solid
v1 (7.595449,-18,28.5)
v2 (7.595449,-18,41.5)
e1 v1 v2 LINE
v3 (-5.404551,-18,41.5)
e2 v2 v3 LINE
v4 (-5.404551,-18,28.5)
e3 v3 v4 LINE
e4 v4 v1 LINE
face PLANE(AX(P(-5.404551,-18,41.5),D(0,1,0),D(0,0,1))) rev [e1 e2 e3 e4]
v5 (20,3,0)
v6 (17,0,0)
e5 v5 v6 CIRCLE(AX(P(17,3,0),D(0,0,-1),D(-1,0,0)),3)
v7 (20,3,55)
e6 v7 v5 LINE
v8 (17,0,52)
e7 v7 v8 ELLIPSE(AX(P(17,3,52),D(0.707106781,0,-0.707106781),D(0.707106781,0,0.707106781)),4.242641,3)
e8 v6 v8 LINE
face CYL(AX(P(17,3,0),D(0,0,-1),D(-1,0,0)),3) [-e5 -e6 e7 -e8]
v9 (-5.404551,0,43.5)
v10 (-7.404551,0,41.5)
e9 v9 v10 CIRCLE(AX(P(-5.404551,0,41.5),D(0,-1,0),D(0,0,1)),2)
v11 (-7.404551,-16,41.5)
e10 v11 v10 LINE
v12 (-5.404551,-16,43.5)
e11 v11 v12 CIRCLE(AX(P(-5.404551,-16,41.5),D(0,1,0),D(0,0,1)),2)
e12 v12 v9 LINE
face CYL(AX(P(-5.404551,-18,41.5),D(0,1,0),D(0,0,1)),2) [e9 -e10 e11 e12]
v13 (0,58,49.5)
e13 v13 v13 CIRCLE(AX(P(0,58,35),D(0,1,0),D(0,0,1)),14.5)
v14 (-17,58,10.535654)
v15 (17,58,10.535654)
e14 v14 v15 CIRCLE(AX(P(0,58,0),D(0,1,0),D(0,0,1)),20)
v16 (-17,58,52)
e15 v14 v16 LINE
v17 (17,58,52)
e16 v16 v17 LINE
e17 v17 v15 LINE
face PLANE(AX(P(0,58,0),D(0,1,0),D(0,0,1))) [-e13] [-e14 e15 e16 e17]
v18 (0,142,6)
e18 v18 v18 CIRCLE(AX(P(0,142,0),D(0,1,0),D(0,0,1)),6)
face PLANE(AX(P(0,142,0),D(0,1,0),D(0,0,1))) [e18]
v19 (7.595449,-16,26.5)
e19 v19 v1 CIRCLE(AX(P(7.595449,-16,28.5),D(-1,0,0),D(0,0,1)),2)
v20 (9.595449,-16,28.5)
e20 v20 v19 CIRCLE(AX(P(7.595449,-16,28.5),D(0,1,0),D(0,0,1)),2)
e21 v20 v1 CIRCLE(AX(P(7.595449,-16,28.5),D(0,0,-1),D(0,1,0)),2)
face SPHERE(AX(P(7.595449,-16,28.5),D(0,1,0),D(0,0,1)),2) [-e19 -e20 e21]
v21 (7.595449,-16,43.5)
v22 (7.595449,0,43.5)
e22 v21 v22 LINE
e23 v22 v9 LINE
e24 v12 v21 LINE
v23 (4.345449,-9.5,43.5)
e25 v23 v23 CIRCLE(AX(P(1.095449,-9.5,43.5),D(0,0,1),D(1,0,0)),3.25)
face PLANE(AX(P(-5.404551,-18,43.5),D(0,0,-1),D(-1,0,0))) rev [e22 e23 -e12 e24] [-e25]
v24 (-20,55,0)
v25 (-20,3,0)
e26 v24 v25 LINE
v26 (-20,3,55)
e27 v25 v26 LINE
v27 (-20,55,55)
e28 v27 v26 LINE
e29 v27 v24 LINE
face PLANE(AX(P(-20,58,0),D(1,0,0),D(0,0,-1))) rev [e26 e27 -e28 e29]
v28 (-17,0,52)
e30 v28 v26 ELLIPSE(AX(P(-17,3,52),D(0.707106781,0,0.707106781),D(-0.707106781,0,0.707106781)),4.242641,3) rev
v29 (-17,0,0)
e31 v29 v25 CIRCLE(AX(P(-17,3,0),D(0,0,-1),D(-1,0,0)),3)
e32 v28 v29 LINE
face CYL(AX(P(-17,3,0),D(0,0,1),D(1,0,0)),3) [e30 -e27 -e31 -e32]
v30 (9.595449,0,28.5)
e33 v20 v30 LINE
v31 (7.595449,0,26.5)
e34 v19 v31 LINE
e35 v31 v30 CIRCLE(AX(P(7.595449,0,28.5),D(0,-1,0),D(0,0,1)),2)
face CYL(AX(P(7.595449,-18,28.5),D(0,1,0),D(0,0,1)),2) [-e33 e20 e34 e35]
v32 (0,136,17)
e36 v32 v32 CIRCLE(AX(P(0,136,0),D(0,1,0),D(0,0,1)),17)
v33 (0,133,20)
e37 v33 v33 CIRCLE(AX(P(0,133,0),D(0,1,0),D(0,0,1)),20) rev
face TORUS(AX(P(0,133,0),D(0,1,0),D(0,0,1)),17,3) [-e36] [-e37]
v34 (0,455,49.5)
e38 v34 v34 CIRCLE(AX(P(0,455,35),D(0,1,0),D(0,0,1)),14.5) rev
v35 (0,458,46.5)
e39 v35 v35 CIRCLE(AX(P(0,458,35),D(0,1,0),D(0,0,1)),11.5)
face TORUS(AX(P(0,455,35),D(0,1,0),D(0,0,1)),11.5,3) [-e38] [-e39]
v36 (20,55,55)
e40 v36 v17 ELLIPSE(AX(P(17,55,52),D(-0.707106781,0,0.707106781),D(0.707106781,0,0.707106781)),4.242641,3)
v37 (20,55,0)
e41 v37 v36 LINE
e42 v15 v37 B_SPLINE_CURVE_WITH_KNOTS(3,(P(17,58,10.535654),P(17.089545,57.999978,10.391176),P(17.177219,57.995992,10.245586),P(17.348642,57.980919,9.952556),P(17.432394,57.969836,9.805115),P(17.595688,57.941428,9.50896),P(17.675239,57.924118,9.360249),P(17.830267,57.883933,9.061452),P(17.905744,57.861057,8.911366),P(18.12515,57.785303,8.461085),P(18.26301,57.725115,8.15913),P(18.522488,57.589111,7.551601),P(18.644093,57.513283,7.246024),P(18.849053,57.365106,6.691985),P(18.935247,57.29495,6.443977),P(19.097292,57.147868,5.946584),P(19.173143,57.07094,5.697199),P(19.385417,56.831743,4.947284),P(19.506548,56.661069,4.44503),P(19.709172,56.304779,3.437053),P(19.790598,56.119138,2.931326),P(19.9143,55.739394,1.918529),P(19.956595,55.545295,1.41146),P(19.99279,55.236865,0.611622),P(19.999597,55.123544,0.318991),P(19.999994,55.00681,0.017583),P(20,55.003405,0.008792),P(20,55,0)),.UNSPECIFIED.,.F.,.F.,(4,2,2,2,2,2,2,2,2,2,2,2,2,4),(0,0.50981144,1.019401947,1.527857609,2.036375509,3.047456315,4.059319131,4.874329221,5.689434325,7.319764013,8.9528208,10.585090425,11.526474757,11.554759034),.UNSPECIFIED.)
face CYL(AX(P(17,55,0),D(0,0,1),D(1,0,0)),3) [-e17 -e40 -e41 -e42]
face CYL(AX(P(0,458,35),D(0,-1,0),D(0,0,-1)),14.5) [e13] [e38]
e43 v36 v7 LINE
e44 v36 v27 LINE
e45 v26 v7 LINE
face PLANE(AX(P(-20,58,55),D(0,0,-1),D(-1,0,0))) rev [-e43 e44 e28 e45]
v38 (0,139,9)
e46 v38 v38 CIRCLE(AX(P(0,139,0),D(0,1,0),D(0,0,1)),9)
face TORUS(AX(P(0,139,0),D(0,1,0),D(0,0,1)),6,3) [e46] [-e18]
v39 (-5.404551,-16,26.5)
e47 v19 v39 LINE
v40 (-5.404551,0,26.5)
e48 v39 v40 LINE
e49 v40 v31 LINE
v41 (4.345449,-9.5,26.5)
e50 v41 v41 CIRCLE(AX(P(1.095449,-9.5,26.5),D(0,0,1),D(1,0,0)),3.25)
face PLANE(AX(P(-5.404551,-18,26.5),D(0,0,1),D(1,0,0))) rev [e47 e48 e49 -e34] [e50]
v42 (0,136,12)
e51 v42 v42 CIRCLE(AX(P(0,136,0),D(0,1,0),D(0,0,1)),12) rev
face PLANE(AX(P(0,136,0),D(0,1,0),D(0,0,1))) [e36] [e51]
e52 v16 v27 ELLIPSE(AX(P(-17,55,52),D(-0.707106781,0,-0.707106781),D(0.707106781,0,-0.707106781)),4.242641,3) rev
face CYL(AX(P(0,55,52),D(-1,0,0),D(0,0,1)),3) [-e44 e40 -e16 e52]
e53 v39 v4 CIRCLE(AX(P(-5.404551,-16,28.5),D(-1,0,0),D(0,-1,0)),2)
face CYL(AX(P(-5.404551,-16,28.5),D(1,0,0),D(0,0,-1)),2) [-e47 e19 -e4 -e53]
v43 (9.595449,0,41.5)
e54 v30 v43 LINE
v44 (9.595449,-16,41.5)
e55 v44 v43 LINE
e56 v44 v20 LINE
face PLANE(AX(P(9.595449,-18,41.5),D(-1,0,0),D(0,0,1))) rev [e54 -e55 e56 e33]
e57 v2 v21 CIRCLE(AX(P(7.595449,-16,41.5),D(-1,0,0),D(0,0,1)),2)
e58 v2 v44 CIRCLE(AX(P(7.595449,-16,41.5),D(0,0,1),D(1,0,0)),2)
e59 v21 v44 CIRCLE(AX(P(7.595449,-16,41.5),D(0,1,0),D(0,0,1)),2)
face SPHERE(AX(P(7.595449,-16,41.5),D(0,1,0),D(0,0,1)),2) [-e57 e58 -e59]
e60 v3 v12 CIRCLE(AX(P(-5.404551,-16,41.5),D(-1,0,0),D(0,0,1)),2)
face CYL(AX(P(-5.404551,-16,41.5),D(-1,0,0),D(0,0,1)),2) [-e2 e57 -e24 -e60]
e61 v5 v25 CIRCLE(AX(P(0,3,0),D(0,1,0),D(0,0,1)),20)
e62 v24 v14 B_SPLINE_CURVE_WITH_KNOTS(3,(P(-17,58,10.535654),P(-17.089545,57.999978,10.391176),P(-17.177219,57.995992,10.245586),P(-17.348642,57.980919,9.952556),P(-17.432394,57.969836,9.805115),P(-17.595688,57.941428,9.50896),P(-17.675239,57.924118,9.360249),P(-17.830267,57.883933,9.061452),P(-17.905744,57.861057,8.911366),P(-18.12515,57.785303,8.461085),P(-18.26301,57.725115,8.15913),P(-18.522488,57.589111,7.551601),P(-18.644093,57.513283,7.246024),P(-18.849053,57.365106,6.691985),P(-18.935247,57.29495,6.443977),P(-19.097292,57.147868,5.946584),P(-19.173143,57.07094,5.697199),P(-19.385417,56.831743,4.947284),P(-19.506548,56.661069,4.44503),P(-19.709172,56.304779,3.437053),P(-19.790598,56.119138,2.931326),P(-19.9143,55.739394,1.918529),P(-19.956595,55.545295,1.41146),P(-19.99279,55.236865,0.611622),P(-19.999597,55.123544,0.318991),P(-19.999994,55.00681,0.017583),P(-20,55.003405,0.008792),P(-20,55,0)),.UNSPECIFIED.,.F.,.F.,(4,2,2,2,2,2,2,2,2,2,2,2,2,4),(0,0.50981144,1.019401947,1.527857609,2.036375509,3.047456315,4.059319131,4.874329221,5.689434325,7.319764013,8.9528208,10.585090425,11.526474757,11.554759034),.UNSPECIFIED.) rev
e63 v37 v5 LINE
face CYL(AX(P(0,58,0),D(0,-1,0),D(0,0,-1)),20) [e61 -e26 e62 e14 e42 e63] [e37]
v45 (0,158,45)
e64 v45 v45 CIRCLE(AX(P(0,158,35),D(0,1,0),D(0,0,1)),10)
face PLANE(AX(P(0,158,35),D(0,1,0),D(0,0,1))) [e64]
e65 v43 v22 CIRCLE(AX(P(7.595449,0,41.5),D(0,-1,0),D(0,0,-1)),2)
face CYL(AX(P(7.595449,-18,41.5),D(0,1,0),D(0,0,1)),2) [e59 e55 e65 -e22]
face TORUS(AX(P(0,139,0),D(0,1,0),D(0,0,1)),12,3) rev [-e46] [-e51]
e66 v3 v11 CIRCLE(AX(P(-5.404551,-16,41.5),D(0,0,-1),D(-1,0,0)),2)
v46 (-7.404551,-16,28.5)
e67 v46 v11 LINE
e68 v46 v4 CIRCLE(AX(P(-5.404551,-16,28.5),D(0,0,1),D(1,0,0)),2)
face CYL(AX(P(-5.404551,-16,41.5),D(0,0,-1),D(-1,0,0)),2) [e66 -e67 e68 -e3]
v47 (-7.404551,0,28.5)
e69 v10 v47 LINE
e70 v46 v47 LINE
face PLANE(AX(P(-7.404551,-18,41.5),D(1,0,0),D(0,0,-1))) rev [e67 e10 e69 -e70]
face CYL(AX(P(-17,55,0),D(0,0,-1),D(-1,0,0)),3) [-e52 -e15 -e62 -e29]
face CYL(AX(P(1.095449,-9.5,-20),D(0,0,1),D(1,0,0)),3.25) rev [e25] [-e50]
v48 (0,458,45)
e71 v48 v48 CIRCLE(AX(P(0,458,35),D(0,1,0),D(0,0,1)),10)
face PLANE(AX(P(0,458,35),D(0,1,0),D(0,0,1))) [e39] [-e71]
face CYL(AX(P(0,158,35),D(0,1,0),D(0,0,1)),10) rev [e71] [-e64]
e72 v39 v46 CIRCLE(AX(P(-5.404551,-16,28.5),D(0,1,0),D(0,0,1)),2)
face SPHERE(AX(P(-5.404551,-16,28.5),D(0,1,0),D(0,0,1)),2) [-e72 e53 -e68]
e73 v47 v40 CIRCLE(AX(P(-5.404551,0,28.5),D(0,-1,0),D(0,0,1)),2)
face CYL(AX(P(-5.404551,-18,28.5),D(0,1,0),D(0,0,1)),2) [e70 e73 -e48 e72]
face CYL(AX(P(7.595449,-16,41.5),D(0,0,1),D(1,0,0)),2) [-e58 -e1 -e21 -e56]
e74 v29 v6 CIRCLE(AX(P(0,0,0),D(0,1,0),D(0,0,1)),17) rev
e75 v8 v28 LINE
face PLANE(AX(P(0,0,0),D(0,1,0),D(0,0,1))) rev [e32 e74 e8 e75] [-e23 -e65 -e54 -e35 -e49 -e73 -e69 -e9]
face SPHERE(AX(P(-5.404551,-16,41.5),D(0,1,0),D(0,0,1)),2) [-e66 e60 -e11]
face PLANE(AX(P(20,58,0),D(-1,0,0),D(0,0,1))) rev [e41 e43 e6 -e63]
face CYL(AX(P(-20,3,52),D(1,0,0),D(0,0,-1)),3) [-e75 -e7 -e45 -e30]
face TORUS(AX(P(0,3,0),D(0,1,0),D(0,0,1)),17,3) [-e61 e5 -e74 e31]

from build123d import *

# Parameters (mm, degrees)
EXTRUDE_1_DEPTH     = 58
SKETCH_2_R          = 20
EXTRUDE_7_DEPTH     = 78
SKETCH_3_R          = 14.5
EXTRUDE_8_DEPTH     = 400
SKETCH_4_R          = 10
CUT_EXTRUDE_1_DEPTH = 300
FILLET_2_R          = 3
FILLET_START        = -21
FILLET_3_DEPTH      = 77
FILLET_3_2_DEPTH    = 41
FILLET_3_3_ANGLE    = 180
FILLET_4_R          = 3
SKETCH_6_R          = 9
EXTRUDE_10_DEPTH    = 6
FILLET_5_R          = 3
FILLET_6_R          = 3
EXTRUDE_11_DEPTH    = 18
FILLET_7_R          = 2
SKETCH_9_R          = 3.25
CUT_EXTRUDE_2_DEPTH = 463.813407343


with BuildPart() as part:
    # 草图1 → 凸台-拉伸1 (new body)
    with BuildSketch(Plane(origin=(0, 0, 0), x_dir=(1, 0, 0), z_dir=(0, 1, 0))):
        with BuildLine():
            Line((20, 0), (20, -55))
            Line((20, -55), (-20, -55))
            Line((-20, -55), (-20, 0))
            ThreePointArc((-20, 0), (0, 20), (20, 0))
        make_face()
    extrude(amount=EXTRUDE_1_DEPTH)

    # 草图2 → 凸台-拉伸7 (add)
    with BuildSketch(Plane(origin=(0, 58, 0), x_dir=(1, 0, 0), z_dir=(0, 1, 0))):
        with Locations(Location((0, 0, 0), (0, 0, 180))):
            Circle(SKETCH_2_R)
    extrude(amount=EXTRUDE_7_DEPTH)

    # 草图3 → 凸台-拉伸8 (add)
    with BuildSketch(Plane(origin=(0, 58, 0), x_dir=(1, 0, 0), z_dir=(0, 1, 0))):
        with Locations(Location((0, -35, 0), (0, 0, 270))):
            Circle(SKETCH_3_R)
    extrude(amount=EXTRUDE_8_DEPTH)

    # 草图4 → 切除-拉伸1 (cut)
    with BuildSketch(Plane(origin=(0, 458, 0), x_dir=(1, 0, 0), z_dir=(0, 1, 0))):
        with Locations(Location((0, -35, 0), (0, 0, 270))):
            Circle(SKETCH_4_R)
    extrude(amount=-CUT_EXTRUDE_1_DEPTH, mode=Mode.SUBTRACT)

    # 圆角2
    # the kernel refuses this fillet: 3 mm, written as the material it takes off along each edge
    with BuildSketch(Plane(origin=(27.5, 58, 55), x_dir=(0, -1, 0), z_dir=(-1, 0, 0))) as fillet_2_piece_1:
        with BuildLine():
            CenterArc((FILLET_2_R, -FILLET_2_R), FILLET_2_R, 90, 90)
            Line((0, -FILLET_2_R), (0, 0))
            Line((0, 0), (FILLET_2_R, 0))
        make_face()
    extrude(amount=55, mode=Mode.SUBTRACT)
    with BuildSketch(Plane(origin=(20, 58, -12.75), x_dir=(0, -1, 0), z_dir=(0, 0, 1))) as fillet_2_piece_2_section:
        with BuildLine():
            CenterArc((FILLET_2_R, -FILLET_2_R), FILLET_2_R, 90, 90)
            Line((0, -FILLET_2_R), (0, 0))
            Line((0, 0), (FILLET_2_R, 0))
        make_face()
    fillet_2_piece_2 = extrude(amount=75.25, mode=Mode.PRIVATE)
    fillet_2_piece_2 = fillet_2_piece_2 - Plane(origin=(0, 58, 0), x_dir=(-1, 0, 0), z_dir=(0, -1, 0)) * Cylinder(20, 163, mode=Mode.PRIVATE)
    add(fillet_2_piece_2, mode=Mode.SUBTRACT)
    with BuildSketch(Plane(origin=(-20, 58, 62.5), x_dir=(1, 0, 0), z_dir=(0, 0, -1))) as fillet_2_piece_3_section:
        with BuildLine():
            CenterArc((FILLET_2_R, FILLET_2_R), FILLET_2_R, 180, 90)
            Line((0, FILLET_2_R), (0, 0))
            Line((0, 0), (FILLET_2_R, 0))
        make_face()
    fillet_2_piece_3 = extrude(amount=75.25, mode=Mode.PRIVATE)
    fillet_2_piece_3 = fillet_2_piece_3 - Plane(origin=(0, 58, 0), x_dir=(-1, 0, 0), z_dir=(0, -1, 0)) * Cylinder(20, 163, mode=Mode.PRIVATE)
    add(fillet_2_piece_3, mode=Mode.SUBTRACT)

    # 圆角3: read off the stored shape, not the designer's step
    # 圆角3 outline → 圆角3 (cut)
    with BuildSketch(Plane.XY.offset(FILLET_START)):
        with BuildLine():
            Line((20, 0), (20, 3))
            ThreePointArc((20, 3), (19.121320344, 0.878679656), (17, 0))
            Line((17, 0), (20, 0))
        make_face()
        with BuildLine():
            Line((-20, 0), (-17, 0))
            ThreePointArc((-17, 0), (-19.121320344, 0.878679656), (-20, 3))
            Line((-20, 3), (-20, 0))
        make_face()
    extrude(amount=FILLET_3_DEPTH, mode=Mode.SUBTRACT)

    # Fillet 3 2 outline → Fillet 3 2 (cut)
    with BuildSketch(Plane.YZ.offset(FILLET_START)):
        with BuildLine():
            ThreePointArc((0, 52), (0.878679656, 54.121320344), (3, 55))
            Line((3, 55), (0, 55))
            Line((0, 55), (0, 52))
        make_face()
    extrude(amount=FILLET_3_2_DEPTH, mode=Mode.SUBTRACT)

    # Fillet 3 3 outline → Fillet 3 3 (revolve, cut)
    with BuildSketch(Plane.XY):
        with BuildLine():
            ThreePointArc((20, 3), (19.121320344, 0.878679656), (17, 0))
            Line((17, 0), (20, 0))
            Line((20, 0), (20, 3))
        make_face()
    revolve(axis=Axis((0, 0, 0), (0, 1, 0)), revolution_arc=FILLET_3_3_ANGLE, mode=Mode.SUBTRACT)

    # 圆角4
    fillet_4_edges = [part.edges().sort_by_distance(p)[0] for p in [
        (20, 136, 0),
    ]]
    fillet(fillet_4_edges, radius=FILLET_4_R)

    # 草图6 → 凸台-拉伸10 (add)
    with BuildSketch(Plane(origin=(0, 136, 0), x_dir=(1, 0, 0), z_dir=(0, 1, 0))):
        with Locations(Location((0, 0, 0), (0, 0, 270))):
            Circle(SKETCH_6_R)
    extrude(amount=EXTRUDE_10_DEPTH)

    # 圆角5
    fillet_5_edges = [part.edges().sort_by_distance(p)[0] for p in [
        (0, 136, -9),
        (0, 142, -9),
    ]]
    fillet(fillet_5_edges, radius=FILLET_5_R - 0.0001)  # a hair under: the kernel refuses the full size

    # 圆角6
    fillet_6_edges = [part.edges().sort_by_distance(p)[0] for p in [
        (0, 458, 20.5),
    ]]
    fillet(fillet_6_edges, radius=FILLET_6_R)

    # 草图7 → 凸台-拉伸11 (add)
    with BuildSketch(Plane.XZ):
        with BuildLine():
            Line((-5.404550966, 43.5), (7.595449034, 43.5))
            ThreePointArc((7.595449034, 43.5), (9.009662596, 42.914213562), (9.595449034, 41.5))
            Line((9.595449034, 41.5), (9.595449034, 28.5))
            ThreePointArc((9.595449034, 28.5), (9.009662596, 27.085786438), (7.595449034, 26.5))
            Line((7.595449034, 26.5), (-5.404550966, 26.5))
            ThreePointArc((-5.404550966, 26.5), (-6.818764529, 27.085786438), (-7.404550966, 28.5))
            Line((-7.404550966, 28.5), (-7.404550966, 41.5))
            ThreePointArc((-7.404550966, 41.5), (-6.818764529, 42.914213562), (-5.404550966, 43.5))
        make_face()
    extrude(amount=EXTRUDE_11_DEPTH)

    # 圆角7
    fillet_7_edges = [part.edges().sort_by_distance(p)[0] for p in [
        (-6.818764529, -18, 42.914213562),
        (-7.404550966, -18, 35),
        (-6.818764529, -18, 27.085786438),
        (1.095449034, -18, 26.5),
        (9.009662596, -18, 27.085786438),
        (9.595449034, -18, 35),
        (9.009662596, -18, 42.914213562),
        (1.095449034, -18, 43.5),
    ]]
    fillet(fillet_7_edges, radius=FILLET_7_R)

    # 草图9 → 切除-拉伸2 (cut, through all)
    with BuildSketch(Plane.XY.offset(43.5)):
        with Locations((1.095449034, -9.5)):
            Circle(SKETCH_9_R)
    extrude(amount=-CUT_EXTRUDE_2_DEPTH, mode=Mode.SUBTRACT)


solid = part.part
